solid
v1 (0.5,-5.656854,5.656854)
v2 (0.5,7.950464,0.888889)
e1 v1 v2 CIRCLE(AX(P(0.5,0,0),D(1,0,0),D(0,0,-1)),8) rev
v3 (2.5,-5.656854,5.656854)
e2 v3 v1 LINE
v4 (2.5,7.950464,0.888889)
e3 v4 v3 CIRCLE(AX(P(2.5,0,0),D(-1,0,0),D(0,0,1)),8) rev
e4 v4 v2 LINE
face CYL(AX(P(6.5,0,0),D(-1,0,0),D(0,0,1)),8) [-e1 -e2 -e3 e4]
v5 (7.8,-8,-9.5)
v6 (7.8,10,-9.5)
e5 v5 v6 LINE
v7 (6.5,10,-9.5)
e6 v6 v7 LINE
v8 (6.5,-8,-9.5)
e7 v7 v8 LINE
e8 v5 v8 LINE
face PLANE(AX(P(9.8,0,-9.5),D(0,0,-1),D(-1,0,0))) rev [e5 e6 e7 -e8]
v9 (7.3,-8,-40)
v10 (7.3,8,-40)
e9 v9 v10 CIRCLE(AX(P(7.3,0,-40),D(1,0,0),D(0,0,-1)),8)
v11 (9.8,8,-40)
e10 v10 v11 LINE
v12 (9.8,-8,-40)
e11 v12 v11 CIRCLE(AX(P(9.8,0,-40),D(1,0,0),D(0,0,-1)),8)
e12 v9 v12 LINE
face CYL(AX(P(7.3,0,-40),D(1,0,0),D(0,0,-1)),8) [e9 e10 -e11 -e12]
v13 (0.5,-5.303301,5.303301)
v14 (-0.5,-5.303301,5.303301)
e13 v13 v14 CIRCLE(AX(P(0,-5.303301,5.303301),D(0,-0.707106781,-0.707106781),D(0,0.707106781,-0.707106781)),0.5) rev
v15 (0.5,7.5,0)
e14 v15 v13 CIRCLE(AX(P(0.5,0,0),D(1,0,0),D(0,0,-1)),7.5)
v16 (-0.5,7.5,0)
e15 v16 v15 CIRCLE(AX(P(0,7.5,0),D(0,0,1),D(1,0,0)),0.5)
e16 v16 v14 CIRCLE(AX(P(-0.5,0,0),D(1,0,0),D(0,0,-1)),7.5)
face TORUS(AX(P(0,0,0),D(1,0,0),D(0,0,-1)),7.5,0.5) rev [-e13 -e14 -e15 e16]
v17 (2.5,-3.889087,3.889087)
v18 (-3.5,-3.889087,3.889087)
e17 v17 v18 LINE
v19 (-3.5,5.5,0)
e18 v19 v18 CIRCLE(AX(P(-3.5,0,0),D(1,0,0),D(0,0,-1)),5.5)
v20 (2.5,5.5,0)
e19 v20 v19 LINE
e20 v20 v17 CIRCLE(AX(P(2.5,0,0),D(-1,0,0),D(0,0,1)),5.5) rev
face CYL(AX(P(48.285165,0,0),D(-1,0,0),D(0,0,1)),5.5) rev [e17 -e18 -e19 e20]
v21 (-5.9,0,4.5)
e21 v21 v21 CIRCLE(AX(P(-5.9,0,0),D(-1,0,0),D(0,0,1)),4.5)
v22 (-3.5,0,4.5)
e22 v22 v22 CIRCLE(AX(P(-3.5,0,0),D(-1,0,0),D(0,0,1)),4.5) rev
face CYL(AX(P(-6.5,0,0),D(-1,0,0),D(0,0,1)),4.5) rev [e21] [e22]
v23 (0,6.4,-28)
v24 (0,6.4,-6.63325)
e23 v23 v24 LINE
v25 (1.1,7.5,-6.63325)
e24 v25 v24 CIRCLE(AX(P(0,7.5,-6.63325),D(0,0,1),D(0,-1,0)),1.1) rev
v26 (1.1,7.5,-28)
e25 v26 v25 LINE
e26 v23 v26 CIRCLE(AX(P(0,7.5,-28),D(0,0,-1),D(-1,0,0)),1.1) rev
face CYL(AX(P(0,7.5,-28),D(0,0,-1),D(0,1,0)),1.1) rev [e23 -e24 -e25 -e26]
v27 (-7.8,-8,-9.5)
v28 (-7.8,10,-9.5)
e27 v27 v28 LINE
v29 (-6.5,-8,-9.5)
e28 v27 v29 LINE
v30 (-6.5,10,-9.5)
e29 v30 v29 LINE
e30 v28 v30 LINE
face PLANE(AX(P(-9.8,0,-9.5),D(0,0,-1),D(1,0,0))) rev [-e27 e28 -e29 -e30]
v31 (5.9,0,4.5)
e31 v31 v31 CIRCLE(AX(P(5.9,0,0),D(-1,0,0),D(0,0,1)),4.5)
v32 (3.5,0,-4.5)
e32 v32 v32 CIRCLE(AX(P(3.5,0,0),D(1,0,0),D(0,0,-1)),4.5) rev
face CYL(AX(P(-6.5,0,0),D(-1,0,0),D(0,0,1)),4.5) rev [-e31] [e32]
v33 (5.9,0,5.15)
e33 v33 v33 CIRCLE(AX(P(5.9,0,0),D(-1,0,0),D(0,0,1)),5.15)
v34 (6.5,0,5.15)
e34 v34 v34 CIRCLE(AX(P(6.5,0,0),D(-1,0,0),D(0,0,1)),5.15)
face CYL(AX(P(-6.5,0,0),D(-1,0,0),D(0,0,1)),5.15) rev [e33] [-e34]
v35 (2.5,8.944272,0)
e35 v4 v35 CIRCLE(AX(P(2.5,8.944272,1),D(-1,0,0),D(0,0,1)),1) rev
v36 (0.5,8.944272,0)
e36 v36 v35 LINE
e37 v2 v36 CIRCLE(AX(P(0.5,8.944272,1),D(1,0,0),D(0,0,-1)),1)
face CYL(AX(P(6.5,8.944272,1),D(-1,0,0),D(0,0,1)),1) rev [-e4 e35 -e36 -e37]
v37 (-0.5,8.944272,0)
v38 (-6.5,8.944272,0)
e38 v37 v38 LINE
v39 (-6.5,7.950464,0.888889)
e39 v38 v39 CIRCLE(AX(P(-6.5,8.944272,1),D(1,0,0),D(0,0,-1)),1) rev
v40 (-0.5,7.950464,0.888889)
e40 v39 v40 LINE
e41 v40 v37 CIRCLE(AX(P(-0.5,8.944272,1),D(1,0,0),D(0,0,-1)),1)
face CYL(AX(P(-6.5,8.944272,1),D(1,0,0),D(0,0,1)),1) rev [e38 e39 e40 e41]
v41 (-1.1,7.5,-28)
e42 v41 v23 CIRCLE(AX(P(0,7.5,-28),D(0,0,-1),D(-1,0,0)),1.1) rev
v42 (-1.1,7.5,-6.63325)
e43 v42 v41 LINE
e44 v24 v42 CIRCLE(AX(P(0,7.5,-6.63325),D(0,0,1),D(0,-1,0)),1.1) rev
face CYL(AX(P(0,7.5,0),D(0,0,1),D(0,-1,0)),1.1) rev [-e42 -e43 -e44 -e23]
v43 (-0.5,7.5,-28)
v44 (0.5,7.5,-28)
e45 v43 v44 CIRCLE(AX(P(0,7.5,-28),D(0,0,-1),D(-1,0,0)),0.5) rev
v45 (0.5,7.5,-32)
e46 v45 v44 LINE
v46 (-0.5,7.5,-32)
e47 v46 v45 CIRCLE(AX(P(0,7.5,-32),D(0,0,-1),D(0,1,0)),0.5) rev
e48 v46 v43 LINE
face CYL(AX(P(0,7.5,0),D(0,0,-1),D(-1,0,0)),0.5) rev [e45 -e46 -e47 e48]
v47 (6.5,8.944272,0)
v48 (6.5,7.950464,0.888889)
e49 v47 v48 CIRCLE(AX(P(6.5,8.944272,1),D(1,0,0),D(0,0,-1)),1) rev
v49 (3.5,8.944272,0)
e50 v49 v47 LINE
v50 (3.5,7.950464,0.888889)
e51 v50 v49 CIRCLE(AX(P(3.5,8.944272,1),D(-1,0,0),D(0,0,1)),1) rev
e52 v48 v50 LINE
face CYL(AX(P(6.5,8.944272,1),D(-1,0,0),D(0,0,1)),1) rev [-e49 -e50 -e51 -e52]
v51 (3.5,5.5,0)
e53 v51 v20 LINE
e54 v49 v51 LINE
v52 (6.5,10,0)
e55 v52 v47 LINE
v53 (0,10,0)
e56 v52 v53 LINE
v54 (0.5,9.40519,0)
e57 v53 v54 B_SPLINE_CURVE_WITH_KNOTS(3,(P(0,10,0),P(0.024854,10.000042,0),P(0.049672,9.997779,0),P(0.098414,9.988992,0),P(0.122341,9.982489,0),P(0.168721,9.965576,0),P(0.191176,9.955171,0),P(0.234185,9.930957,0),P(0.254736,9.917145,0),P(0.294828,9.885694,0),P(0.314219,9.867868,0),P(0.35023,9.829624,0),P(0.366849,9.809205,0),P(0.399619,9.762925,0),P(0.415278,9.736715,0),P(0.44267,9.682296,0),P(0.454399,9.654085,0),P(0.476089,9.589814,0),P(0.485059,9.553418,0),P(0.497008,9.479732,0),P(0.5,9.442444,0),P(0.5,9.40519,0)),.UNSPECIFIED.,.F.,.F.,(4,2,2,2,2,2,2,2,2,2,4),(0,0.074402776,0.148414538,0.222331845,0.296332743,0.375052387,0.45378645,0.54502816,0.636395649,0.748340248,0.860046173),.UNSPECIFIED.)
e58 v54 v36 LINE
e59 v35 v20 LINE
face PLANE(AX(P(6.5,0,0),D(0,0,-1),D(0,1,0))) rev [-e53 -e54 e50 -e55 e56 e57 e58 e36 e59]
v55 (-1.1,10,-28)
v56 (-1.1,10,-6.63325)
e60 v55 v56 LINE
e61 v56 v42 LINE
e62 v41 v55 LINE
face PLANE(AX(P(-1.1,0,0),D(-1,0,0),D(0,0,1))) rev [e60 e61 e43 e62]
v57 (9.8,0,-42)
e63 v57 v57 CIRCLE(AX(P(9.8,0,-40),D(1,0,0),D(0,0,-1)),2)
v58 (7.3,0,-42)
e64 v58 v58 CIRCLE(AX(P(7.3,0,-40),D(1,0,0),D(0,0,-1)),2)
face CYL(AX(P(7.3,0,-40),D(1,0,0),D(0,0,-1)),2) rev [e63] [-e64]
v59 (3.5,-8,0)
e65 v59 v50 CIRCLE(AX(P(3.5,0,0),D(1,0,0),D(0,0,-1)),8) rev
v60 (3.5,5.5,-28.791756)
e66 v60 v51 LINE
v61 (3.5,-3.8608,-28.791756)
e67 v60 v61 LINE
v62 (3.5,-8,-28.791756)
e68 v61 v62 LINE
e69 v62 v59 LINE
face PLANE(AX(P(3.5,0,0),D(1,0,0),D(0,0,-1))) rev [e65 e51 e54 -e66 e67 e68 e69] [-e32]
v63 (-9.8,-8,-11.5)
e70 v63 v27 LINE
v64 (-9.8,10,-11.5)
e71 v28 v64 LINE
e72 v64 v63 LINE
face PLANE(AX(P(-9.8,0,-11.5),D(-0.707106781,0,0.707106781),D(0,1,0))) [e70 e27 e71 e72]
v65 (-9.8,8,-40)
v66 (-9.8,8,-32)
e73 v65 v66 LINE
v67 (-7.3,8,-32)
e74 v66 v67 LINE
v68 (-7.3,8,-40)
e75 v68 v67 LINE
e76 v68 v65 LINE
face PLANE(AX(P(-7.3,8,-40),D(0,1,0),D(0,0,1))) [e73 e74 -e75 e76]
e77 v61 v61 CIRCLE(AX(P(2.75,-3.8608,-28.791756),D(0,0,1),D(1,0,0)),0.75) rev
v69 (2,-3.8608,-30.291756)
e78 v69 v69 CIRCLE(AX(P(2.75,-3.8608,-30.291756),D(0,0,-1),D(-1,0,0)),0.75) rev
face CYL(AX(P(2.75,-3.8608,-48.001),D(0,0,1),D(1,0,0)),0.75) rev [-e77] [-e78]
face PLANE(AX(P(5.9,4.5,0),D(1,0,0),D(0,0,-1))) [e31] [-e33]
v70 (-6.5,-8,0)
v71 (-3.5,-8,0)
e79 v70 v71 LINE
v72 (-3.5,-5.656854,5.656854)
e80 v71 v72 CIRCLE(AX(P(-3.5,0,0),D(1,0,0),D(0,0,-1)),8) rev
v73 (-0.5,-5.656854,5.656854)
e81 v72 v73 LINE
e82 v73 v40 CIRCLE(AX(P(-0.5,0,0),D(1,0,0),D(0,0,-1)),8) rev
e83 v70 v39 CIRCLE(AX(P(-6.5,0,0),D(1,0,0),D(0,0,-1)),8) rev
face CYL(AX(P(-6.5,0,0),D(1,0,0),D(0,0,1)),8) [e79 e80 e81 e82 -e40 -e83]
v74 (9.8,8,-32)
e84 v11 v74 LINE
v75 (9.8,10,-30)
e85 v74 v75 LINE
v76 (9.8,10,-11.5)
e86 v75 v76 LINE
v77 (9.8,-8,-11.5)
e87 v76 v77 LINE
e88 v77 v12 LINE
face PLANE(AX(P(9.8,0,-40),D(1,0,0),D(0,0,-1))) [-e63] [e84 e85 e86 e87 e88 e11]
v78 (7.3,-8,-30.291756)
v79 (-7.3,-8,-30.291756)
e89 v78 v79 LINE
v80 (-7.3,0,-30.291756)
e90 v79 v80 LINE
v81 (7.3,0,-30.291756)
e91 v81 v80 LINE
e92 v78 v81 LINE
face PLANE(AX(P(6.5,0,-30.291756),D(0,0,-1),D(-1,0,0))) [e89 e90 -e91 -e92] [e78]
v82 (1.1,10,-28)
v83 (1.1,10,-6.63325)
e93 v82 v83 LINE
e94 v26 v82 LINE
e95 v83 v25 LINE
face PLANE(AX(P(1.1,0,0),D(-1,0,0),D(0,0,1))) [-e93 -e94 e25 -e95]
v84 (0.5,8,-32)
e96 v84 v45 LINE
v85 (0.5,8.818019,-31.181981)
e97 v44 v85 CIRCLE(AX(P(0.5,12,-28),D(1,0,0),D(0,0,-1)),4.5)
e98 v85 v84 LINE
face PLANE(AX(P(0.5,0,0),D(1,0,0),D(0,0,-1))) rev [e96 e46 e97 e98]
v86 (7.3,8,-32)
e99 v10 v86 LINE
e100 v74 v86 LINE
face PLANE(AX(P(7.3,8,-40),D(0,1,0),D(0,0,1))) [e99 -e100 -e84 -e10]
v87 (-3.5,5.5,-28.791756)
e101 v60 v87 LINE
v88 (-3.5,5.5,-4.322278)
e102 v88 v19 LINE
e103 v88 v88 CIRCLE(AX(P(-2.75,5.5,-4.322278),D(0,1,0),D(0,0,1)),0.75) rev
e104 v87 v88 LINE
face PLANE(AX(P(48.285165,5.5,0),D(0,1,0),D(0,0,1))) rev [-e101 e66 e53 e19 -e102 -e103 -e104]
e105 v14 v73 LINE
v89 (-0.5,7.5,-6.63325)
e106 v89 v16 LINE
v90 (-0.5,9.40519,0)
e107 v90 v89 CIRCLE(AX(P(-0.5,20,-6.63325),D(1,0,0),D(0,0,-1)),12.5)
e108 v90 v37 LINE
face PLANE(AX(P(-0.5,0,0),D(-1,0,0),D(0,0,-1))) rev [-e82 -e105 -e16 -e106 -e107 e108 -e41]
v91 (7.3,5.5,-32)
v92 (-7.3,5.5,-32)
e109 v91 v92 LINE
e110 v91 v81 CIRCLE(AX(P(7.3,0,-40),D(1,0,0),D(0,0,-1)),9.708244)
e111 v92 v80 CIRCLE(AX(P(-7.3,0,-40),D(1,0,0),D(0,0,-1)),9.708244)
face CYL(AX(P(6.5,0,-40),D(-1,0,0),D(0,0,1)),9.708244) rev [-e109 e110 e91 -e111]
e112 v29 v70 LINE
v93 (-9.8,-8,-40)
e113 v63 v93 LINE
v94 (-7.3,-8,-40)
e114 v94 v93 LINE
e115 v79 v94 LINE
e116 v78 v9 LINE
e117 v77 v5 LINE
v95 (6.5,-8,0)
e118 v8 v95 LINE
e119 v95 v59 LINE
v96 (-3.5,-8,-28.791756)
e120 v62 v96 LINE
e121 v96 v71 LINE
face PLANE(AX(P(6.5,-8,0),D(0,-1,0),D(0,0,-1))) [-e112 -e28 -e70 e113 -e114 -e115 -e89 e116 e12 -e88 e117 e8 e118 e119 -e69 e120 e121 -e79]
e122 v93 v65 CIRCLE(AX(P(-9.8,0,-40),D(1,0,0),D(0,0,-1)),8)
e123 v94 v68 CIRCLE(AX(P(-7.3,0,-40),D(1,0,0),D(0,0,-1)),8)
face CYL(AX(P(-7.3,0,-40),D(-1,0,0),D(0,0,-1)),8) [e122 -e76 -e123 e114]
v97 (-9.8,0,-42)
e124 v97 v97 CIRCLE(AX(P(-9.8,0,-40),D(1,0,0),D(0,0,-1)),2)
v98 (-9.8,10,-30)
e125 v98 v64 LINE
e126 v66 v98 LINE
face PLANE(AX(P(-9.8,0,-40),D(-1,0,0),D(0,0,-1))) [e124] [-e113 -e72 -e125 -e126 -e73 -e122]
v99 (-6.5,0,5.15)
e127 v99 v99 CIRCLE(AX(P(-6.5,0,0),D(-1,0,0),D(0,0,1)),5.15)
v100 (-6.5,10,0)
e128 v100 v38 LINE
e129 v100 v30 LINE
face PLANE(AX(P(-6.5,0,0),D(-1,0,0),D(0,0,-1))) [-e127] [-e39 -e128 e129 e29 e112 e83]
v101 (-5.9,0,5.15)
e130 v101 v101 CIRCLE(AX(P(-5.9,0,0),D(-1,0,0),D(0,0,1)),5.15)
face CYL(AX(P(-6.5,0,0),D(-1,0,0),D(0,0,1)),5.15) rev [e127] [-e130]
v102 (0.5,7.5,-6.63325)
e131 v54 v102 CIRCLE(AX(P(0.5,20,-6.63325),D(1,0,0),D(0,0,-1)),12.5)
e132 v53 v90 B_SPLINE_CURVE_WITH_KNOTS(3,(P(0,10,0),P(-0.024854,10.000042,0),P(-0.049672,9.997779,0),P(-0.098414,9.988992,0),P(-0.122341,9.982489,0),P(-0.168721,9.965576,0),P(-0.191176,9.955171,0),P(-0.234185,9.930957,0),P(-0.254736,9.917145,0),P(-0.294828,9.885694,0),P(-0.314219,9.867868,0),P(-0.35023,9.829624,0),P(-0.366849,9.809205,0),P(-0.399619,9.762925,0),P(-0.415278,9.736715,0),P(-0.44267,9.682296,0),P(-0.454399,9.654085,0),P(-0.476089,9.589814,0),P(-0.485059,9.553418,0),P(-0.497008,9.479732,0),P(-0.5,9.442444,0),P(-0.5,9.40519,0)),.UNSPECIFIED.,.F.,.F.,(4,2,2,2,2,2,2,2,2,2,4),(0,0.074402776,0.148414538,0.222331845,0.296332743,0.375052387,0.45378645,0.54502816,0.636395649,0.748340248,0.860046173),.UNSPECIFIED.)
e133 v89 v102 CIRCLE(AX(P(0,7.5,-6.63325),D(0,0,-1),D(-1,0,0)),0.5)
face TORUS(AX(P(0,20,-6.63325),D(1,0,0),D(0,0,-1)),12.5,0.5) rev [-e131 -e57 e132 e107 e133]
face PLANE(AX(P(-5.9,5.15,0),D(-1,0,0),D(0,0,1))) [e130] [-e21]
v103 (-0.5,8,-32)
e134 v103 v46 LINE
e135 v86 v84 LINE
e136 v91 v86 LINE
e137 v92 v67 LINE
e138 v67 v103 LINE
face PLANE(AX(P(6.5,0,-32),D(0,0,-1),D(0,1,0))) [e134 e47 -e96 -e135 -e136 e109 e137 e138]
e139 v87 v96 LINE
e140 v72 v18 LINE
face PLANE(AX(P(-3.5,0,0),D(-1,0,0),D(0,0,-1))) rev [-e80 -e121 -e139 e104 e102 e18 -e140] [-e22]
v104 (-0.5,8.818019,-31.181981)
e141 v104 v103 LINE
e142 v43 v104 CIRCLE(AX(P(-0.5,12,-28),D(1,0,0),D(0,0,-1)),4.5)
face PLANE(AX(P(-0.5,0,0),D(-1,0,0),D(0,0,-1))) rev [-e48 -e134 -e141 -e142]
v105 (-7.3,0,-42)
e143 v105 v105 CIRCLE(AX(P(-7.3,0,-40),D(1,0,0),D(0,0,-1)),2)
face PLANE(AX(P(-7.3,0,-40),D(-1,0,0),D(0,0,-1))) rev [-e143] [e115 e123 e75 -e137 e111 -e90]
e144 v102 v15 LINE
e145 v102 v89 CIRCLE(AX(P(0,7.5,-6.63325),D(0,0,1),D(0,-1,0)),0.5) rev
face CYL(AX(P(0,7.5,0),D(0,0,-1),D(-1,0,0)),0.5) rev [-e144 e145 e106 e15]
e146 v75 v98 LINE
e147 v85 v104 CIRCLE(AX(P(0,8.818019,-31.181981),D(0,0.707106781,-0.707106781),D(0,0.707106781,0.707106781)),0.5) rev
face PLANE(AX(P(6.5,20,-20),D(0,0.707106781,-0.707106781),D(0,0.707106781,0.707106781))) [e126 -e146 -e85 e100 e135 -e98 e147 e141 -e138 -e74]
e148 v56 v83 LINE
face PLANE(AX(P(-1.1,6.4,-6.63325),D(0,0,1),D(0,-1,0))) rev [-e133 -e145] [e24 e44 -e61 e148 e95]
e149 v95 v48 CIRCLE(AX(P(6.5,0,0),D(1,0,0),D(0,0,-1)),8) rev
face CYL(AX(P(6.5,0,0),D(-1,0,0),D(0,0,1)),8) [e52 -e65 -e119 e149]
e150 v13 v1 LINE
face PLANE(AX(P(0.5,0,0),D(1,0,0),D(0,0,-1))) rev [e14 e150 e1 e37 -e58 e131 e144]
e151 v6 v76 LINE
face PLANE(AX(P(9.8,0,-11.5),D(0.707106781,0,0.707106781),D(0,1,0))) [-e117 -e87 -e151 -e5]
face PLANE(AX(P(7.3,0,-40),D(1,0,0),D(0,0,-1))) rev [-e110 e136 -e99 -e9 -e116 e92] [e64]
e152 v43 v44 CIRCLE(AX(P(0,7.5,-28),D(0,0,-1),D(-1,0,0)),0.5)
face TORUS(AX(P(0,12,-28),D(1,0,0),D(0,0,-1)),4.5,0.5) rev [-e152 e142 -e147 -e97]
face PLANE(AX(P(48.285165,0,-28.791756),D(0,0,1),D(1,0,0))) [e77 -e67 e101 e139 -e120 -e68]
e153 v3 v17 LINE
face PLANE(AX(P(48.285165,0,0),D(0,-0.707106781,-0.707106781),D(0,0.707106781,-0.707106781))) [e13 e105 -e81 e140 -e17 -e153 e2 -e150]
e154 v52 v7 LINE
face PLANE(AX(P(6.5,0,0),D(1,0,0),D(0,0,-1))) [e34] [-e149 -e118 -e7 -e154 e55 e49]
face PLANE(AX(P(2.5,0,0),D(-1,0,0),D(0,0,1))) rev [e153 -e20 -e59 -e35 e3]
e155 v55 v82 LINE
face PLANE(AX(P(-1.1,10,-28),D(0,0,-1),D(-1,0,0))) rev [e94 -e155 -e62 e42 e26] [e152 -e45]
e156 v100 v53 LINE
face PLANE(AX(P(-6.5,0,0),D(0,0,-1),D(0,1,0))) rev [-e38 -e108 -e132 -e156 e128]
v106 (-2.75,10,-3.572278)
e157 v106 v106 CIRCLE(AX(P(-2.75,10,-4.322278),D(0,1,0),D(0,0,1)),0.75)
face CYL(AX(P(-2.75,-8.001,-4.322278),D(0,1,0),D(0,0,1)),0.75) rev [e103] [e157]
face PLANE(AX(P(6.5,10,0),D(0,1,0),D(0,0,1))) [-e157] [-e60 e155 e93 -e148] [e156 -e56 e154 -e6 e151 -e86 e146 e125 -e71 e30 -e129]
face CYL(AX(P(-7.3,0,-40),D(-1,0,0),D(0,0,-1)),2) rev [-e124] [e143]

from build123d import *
from build123d.topology import SkipClean

# Parameters (mm, degrees)
BOSS_EXTRU_1_START      = 3.5
ESQUISSE1_R             = 2
BOSS_EXTRU_1_DEPTH      = 3
BOSS_EXTRU_2_START      = 6.5
BOSS_EXTRU_2_DEPTH      = 3.3
BOSS_EXTRU_5_START      = 7.3
ESQUISSE1_12_R          = 2
BOSS_EXTRU_5_DEPTH      = 2.5
BOSS_EXTRU_3_DEPTH      = 6.5
BOSS_EXTRU_4_START      = 0.5
BOSS_EXTRU_4_DEPTH      = 6
CONG_4_R                = 12
FILLET1_R               = 0.5
FILLET2_R               = 1
CHAMFER1_SIZE           = 2
ENL_V_START             = 3.5
ESQUISSE2_W             = 8
ESQUISSE2_H             = 18
ENL_V_MAT_EXTRU_1_DEPTH = 1
ENL_V_MAT_EXTRU_3_REACH = 52
ESQUISSE4_R             = 0.75
ESQUISSE5_W             = 21.366750419
ESQUISSE5_H             = 3.6
ENL_V_MAT_EXTRU_4_DEPTH = 1.1
CONG_5_R                = 1.1
ENL_V_MAT_EXTRU_5_REACH = 54.192
ESQUISSE12_R            = 0.75


# Some blends are built 0.0001 mm under size
with BuildPart() as part:
    # Esquisse1 → Boss.-Extru.1 (new body)
    with BuildSketch(Plane(origin=(0, 0, 0), x_dir=(0, 0, -1), z_dir=(1, 0, 0)).offset(BOSS_EXTRU_1_START)):
        with BuildLine():
            Line((30, 10), (0, 10))
            Line((0, 10), (0, 8))
            ThreePointArc((0, 8), (-8, 0), (0, -8))
            Line((0, -8), (30.291756081, -8))
            Line((30.291756081, -8), (30.291756081, 0))
            ThreePointArc((30.291756081, 0), (30.728647581, 2.879587526), (32, 5.5))
            Line((32, 5.5), (32, 8))
            Line((32, 8), (30, 10))
        make_face()
        Circle(ESQUISSE1_R, mode=Mode.SUBTRACT)
    extrude(amount=BOSS_EXTRU_1_DEPTH)

    # Esquisse1<8> → Boss.-Extru.2 (add)
    with BuildSketch(Plane(origin=(0, 0, 0), x_dir=(0, 0, -1), z_dir=(1, 0, 0)).offset(BOSS_EXTRU_2_START)):
        with BuildLine():
            Line((30, 10), (9.5, 10))
            Line((9.5, 10), (9.5, -8))
            Line((9.5, -8), (30.291756081, -8))
            Line((30.291756081, -8), (30.291756081, 0))
            ThreePointArc((30.291756081, 0), (30.728647581, 2.879587526), (32, 5.5))
            Line((32, 5.5), (32, 8))
            Line((32, 8), (30, 10))
        make_face()
    extrude(amount=BOSS_EXTRU_2_DEPTH)

    # Esquisse1<12> → Boss.-Extru.5 (add)
    with BuildSketch(Plane(origin=(0, 0, 0), x_dir=(0, 0, -1), z_dir=(1, 0, 0)).offset(BOSS_EXTRU_5_START)):
        with BuildLine():
            Line((40, 8), (32, 8))
            Line((32, 8), (32, 7))
            Line((32, 7), (32, 5.5))
            ThreePointArc((32, 5.5), (30.728647581, 2.879587526), (30.291756081, 0))
            Line((30.291756081, 0), (30.291756081, -8))
            Line((30.291756081, -8), (40, -8))
            ThreePointArc((40, -8), (48, 0), (40, 8))
        make_face()
        with Locations((40, 0)):
            Circle(ESQUISSE1_12_R, mode=Mode.SUBTRACT)
    extrude(amount=BOSS_EXTRU_5_DEPTH)

    # Esquisse1<9> → Boss.-Extru.3 (add)
    with BuildSketch(Plane(origin=(0, 0, 0), x_dir=(0, 0, -1), z_dir=(1, 0, 0))):
        with BuildLine():
            Line((0, 10), (2, 8))
            Line((2, 8), (28, 8))
            ThreePointArc((28, 8), (29.530733729, 8.30448187), (30.828427125, 9.171572875))
            Line((30.828427125, 9.171572875), (30, 10))
            Line((30, 10), (0, 10))
        make_face()
        with BuildLine():
            Line((0, 5.5), (28.791756081, 5.5))
            Line((28.791756081, 5.5), (28.791756081, -8))
            Line((28.791756081, -8), (30.291756081, -8))
            Line((30.291756081, -8), (30.291756081, 0))
            ThreePointArc((30.291756081, 0), (30.728647581, 2.879587526), (32, 5.5))
            Line((32, 5.5), (32, 7))
            Line((32, 7), (0, 7))
            ThreePointArc((0, 7), (-6.467156728, 2.678784027), (-4.949747468, -4.949747468))
            Line((-4.949747468, -4.949747468), (-3.889087297, -3.889087297))
            ThreePointArc((-3.889087297, -3.889087297), (-5.081337429, 2.104758878), (0, 5.5))
        make_face()
    extrude(amount=BOSS_EXTRU_3_DEPTH)

    # Esquisse1<10> → Boss.-Extru.4 (add)
    with BuildSketch(Plane(origin=(0, 0, 0), x_dir=(0, 0, -1), z_dir=(1, 0, 0)).offset(BOSS_EXTRU_4_START)):
        with BuildLine():
            Line((2, 8), (0, 10))
            Line((0, 10), (0, 8))
            ThreePointArc((0, 8), (-7.39103626, 3.061467459), (-5.656854249, -5.656854249))
            Line((-5.656854249, -5.656854249), (-4.949747468, -4.949747468))
            ThreePointArc((-4.949747468, -4.949747468), (-6.467156728, 2.678784027), (0, 7))
            Line((0, 7), (32, 7))
            Line((32, 7), (32, 8))
            Line((32, 8), (30.828427125, 9.171572875))
            ThreePointArc((30.828427125, 9.171572875), (29.530733729, 8.30448187), (28, 8))
            Line((28, 8), (2, 8))
        make_face()
    extrude(amount=BOSS_EXTRU_4_DEPTH)

    # Congé4
    # the kernel refuses this fillet: 12 mm, written as the material it takes off along each edge
    with BuildSketch(Plane(origin=(-11.583123952, 8, -2), x_dir=(0, 0, -1), z_dir=(1, 0, 0))) as cong_4_piece_1:
        with BuildLine():
            CenterArc((4.633249581, 12), CONG_4_R, 236.442690238, 33.557309762)
            Line((-2, 2), (-2.132664992, 1.8))
            ThreePointArc((-2.132664992, 1.8), (-1.169705627, 0.830294373), (-0.169705627, -0.169705627))
            Line((-0.169705627, -0.169705627), (0, -0.24))
            Line((0, -0.24), (4.633249581, -0.24))
            Line((4.633249581, -0.24), (4.633249581, 0))
        make_face()
    extrude(amount=12.083123952, mode=Mode.SUBTRACT)

    # Fillet1
    # the kernel refuses this fillet: 0.5 mm, written as the material it adds along each edge
    with BuildSketch(Plane(origin=(0.5, 20, -6.633249581), x_dir=(0, -0.7713363788823462, 0.6364276790120538), z_dir=(0, 0.6364276790120538, 0.7713363788823462))) as fillet1_piece_1_section:
        with BuildLine():
            CenterArc((12 + FILLET1_R, -FILLET1_R), FILLET1_R, 90, 90)
            Line((12 + FILLET1_R, 0), (12, 0))
            Line((12, 0), (12, -FILLET1_R))
        make_face()
    fillet1_piece_1 = revolve(axis=Axis((0.5, 20, -6.633249581), (1, 0, 0)), revolution_arc=39.525953359, mode=Mode.PRIVATE)
    fillet1_piece_1 = split(fillet1_piece_1, bisect_by=Plane(origin=(0.358961784, 10, -3.12843374), z_dir=(0, -1, 0)), keep=Keep.TOP, mode=Mode.PRIVATE)
    fillet1_piece_1 = split(fillet1_piece_1, bisect_by=Plane(origin=(0.358961784, 8.375840896, 0), z_dir=(0, 0, -1)), keep=Keep.TOP, mode=Mode.PRIVATE)
    add(fillet1_piece_1)
    with BuildSketch(Plane(origin=(0.5, 8, -28), x_dir=(-1, 0, 0), z_dir=(0, 0, 1))) as fillet1_piece_2:
        with BuildLine():
            CenterArc((FILLET1_R, FILLET1_R), FILLET1_R, 180, 90)
            Line((0, FILLET1_R), (0, 0))
            Line((0, 0), (FILLET1_R, 0))
        make_face()
    extrude(amount=21.366750419)
    with BuildSketch(Plane(origin=(0.5, 7, 0), x_dir=(-1, 0, 0), z_dir=(0, 0, -1))) as fillet1_piece_3:
        with BuildLine():
            CenterArc((FILLET1_R, FILLET1_R), FILLET1_R, 180, 90)
            Line((0, FILLET1_R), (0, 0))
            Line((0, 0), (FILLET1_R, 0))
        make_face()
    extrude(amount=32)
    with BuildSketch(Plane(origin=(0.5, 0, 0), x_dir=(0, -0.7071067811865441, 0.7071067811865509), z_dir=(0, -0.7071067811865509, -0.7071067811865441))) as fillet1_piece_4:
        with BuildLine():
            CenterArc((7 + FILLET1_R, FILLET1_R), FILLET1_R, 180, 90)
            Line((7 + FILLET1_R, 0), (7, 0))
            Line((7, 0), (7, FILLET1_R))
        make_face()
    revolve(axis=Axis((0.5, 0, 0), (-1, 0, 0)), revolution_arc=135)
    with BuildSketch(Plane(origin=(0.5, 12, -28), x_dir=(0, -0.7071067811865426, -0.7071067811865523), z_dir=(0, 0.7071067811865523, -0.7071067811865426))) as fillet1_piece_5:
        with BuildLine():
            CenterArc((4 + FILLET1_R, FILLET1_R), FILLET1_R, 180, 90)
            Line((4 + FILLET1_R, 0), (4, 0))
            Line((4, 0), (4, FILLET1_R))
        make_face()
    revolve(axis=Axis((0.5, 12, -28), (-1, 0, 0)), revolution_arc=45)

    # Fillet2
    fillet2_edges = [part.edges().sort_by_distance(p)[0] for p in [
        (3.5, 8, 0),
    ]]
    fillet(fillet2_edges, radius=FILLET2_R)

    # Chamfer1
    chamfer1_edges = [part.edges().sort_by_distance(p)[0] for p in [
        (9.8, 1, -9.5),
    ]]
    chamfer(chamfer1_edges, length=CHAMFER1_SIZE)

    # Symétrie1: part across plane


with BuildPart() as part_1:
    add(part.part)
    add(part.part.mirror(Plane(origin=(0, 0, 0), x_dir=(0, 0, 1), z_dir=(1, 0, 0))))

    # Esquisse2 → Enlèv. mat.-Extru.1 (cut)
    with SkipClean():  # the faces are left unmerged after this step: merging them gives an invalid solid
        with BuildSketch(Plane(origin=(0, 0, 0), x_dir=(0, 0, -1), z_dir=(1, 0, 0)).offset(ENL_V_START)):
            with Locations((-4, 1)):
                Rectangle(ESQUISSE2_W, ESQUISSE2_H)
        extrude(amount=-ENL_V_MAT_EXTRU_1_DEPTH, mode=Mode.SUBTRACT)

    # Esquisse4 → Enlèv. mat.-Extru.3 (cut, up to next)
    with BuildSketch(Plane.XY, mode=Mode.PRIVATE) as enl_v_mat_extru_3_sk1:
        with Locations((2.75, -3.8608)):
            Circle(ESQUISSE4_R)
    enl_v_mat_extru_3_tool1 = extrude(enl_v_mat_extru_3_sk1.sketch, amount=-ENL_V_MAT_EXTRU_3_REACH, mode=Mode.PRIVATE) & part_1.part
    add(enl_v_mat_extru_3_tool1.solids().sort_by_distance((2.75, -3.8608, 0))[0], mode=Mode.SUBTRACT)

    # Esquisse5 → Enlèv. mat.-Extru.4 (cut, symmetric)
    with SkipClean():  # the faces are left unmerged after this step: merging them gives an invalid solid
        with BuildSketch(Plane(origin=(0, 0, 0), x_dir=(0, 0, -1), z_dir=(1, 0, 0))):
            with Locations((17.316624791, 8.2)):
                Rectangle(ESQUISSE5_W, ESQUISSE5_H)
        extrude(amount=ENL_V_MAT_EXTRU_4_DEPTH, both=True, mode=Mode.SUBTRACT)

    # Congé5
    cong_5_edges = [part_1.edges().sort_by_distance(p)[0] for p in [
        (1.1, 6.4, -17.31662479),
        (-1.1, 6.4, -17.31662479),
    ]]
    fillet(cong_5_edges, radius=CONG_5_R - 0.0001)  # a hair under: the kernel refuses the full size

    # Esquisse10 → Enlèvement de matière-Révolution1 (revolve, cut)
    with BuildSketch(Plane.XY, mode=Mode.PRIVATE) as enl_vement_de_mati_re_r_volution1_sk:
        Polygon((-6.5, 5.15), (-5.9, 5.15), (-5.9, 4.5), (5.9, 4.5), (5.9, 5.15), (6.5, 5.15), (6.5, 2), (-6.5, 2), align=None)
    revolve(enl_vement_de_mati_re_r_volution1_sk.sketch.rotate(Axis((-6.5, 0, 0), (1, 0, 0)), 90), axis=Axis((-6.5, 0, 0), (1, 0, 0)), mode=Mode.SUBTRACT)

    # Esquisse12 → Enlèv. mat.-Extru.5 (cut, up to next)
    with BuildSketch(Plane(origin=(0, 10, 0), x_dir=(1, 0, 0), z_dir=(0, 1, 0)), mode=Mode.PRIVATE) as enl_v_mat_extru_5_sk1:
        with Locations(Location((-2.75, 4.322277882, 0), (0, 0, 270))):
            Circle(ESQUISSE12_R)
    enl_v_mat_extru_5_tool1 = extrude(enl_v_mat_extru_5_sk1.sketch, amount=-ENL_V_MAT_EXTRU_5_REACH, mode=Mode.PRIVATE) & part_1.part
    add(enl_v_mat_extru_5_tool1.solids().sort_by_distance((-2.75, 10, -4.322278))[0], mode=Mode.SUBTRACT)


solid = part_1.part
